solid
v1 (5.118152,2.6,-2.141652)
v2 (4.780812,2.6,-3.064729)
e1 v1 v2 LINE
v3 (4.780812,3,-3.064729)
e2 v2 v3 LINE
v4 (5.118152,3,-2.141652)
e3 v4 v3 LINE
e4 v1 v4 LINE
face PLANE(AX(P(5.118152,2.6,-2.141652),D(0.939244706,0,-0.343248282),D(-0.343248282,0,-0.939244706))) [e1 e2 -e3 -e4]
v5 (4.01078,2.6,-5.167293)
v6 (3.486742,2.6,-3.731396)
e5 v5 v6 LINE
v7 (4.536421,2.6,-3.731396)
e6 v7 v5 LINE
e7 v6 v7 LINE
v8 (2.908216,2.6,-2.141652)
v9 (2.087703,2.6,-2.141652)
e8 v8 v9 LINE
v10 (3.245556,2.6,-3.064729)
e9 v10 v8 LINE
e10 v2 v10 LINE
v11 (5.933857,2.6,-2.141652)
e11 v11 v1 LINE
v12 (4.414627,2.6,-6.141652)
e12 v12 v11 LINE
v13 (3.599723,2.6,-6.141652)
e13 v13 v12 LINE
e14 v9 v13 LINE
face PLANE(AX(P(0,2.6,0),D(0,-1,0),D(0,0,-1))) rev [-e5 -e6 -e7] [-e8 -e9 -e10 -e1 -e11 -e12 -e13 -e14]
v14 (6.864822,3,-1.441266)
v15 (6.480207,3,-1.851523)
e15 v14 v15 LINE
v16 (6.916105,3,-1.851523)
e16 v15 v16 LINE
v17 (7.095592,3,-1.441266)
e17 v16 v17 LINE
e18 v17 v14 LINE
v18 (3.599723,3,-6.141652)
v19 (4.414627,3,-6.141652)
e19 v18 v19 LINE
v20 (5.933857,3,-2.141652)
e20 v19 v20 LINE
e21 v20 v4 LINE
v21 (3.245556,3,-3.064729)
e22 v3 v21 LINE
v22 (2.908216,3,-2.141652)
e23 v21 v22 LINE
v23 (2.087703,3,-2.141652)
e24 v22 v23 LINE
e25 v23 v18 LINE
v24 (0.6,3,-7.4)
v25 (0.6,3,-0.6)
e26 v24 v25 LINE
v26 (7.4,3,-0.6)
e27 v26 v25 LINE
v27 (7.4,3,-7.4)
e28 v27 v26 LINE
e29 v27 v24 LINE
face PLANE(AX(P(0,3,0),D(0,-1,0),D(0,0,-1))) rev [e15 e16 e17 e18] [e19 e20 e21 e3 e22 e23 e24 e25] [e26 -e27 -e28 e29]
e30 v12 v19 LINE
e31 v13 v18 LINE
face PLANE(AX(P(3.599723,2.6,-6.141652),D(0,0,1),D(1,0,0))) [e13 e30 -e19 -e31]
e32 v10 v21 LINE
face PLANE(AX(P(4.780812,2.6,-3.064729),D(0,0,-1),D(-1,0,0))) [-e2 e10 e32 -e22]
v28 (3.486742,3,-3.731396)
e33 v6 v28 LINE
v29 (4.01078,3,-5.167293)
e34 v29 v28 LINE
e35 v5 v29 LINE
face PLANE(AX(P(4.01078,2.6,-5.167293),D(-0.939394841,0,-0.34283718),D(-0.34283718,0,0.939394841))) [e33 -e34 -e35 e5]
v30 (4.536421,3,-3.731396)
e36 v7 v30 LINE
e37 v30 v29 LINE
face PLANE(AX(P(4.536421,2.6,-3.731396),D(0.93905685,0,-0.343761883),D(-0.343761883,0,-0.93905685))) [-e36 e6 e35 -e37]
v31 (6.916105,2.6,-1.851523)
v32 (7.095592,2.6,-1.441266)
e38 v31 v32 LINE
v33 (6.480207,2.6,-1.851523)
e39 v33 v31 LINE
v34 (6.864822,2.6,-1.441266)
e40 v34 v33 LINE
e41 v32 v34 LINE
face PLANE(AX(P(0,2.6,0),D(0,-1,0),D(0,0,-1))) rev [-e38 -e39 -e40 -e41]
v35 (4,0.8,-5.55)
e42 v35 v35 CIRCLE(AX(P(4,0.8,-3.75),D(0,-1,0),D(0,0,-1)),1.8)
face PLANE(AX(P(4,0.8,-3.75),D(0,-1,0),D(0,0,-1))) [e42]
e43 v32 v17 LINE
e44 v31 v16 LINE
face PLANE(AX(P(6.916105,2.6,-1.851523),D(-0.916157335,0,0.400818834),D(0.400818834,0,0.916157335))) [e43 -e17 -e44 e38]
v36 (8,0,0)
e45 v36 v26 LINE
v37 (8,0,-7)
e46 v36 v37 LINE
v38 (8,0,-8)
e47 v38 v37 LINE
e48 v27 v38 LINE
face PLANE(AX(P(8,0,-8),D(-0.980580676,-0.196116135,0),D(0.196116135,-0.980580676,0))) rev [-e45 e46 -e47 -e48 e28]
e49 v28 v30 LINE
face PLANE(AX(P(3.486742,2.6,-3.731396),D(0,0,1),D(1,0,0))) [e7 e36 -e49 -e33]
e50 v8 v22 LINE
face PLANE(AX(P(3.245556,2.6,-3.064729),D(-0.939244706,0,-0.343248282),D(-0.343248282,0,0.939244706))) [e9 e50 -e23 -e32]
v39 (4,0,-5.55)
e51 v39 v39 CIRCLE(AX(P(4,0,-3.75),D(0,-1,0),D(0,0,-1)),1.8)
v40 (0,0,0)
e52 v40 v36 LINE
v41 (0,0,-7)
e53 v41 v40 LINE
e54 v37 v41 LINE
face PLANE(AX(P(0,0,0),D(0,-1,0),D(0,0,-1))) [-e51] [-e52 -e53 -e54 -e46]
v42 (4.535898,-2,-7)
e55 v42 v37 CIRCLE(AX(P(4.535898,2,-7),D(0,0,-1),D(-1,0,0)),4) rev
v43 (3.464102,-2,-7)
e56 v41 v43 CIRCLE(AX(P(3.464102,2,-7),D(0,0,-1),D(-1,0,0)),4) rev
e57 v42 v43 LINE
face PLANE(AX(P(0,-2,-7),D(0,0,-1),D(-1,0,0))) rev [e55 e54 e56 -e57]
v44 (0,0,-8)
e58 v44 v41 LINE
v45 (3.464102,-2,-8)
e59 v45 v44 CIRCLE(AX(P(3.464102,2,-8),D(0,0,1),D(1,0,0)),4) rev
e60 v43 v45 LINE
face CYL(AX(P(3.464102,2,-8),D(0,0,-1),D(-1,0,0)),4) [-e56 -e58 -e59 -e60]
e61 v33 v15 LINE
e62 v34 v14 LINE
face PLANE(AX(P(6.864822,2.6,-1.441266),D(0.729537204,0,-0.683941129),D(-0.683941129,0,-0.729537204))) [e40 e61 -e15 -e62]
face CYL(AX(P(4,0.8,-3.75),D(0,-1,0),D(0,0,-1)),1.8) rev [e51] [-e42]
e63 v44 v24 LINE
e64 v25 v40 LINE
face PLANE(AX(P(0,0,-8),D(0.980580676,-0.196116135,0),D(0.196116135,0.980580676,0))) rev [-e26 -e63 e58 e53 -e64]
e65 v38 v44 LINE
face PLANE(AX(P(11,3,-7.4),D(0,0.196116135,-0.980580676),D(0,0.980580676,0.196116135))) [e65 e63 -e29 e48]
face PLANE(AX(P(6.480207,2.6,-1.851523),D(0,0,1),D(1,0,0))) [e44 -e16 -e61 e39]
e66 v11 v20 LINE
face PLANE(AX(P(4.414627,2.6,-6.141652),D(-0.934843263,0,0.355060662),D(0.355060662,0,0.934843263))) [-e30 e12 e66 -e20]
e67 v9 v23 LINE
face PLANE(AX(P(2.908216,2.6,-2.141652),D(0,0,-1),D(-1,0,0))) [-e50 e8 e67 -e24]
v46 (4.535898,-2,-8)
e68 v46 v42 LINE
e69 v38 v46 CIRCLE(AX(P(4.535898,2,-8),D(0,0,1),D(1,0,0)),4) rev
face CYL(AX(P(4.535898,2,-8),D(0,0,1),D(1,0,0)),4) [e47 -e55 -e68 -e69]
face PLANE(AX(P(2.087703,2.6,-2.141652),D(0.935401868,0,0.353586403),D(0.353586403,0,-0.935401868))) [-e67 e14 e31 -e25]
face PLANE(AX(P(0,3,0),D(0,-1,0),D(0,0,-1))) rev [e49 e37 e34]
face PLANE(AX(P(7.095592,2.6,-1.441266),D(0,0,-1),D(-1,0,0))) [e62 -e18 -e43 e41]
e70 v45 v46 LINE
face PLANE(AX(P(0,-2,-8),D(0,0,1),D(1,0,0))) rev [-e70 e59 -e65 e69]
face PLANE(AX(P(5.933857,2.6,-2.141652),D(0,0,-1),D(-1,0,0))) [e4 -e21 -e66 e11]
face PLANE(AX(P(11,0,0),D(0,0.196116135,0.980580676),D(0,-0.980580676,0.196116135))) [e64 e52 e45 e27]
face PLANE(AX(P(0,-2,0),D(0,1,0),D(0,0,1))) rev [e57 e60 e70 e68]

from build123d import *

# Parameters (mm, degrees)
SKETCH1_W               = 8
SKETCH1_H               = 8
BOSS_EXTRUDE1_DEPTH     = 3
CUT_EXTRUDE1_DEPTH      = 12.704699911
CUT_EXTRUDE1_DEPTH_BACK = 12.704699911
CUT_EXTRUDE2_DEPTH      = 11
SKETCH4_R               = 1.8
CUT_EXTRUDE3_DEPTH      = 0.8
SKETCH5_W               = 8
SKETCH5_H               = 1
BOSS_EXTRUDE2_DEPTH     = 2
FILLET1_R               = 4
CUT_EXTRUDE4_DEPTH      = 0.4
CUT_EXTRUDE5_DEPTH      = 0.4


with BuildPart() as part:
    # Sketch1 → Boss-Extrude1 (new body)
    with BuildSketch(Plane(origin=(0, 0, 0), x_dir=(1, 0, 0), z_dir=(0, 1, 0))):
        with Locations((4, 4)):
            Rectangle(SKETCH1_W, SKETCH1_H)
    extrude(amount=BOSS_EXTRUDE1_DEPTH)

    # Sketch2 → Cut-Extrude1 (cut, two sides: drawn at the far end of the back side and taken through both)
    with BuildSketch(Plane.XY.offset(-CUT_EXTRUDE1_DEPTH_BACK)):
        Polygon((0, 0), (0.6, 3), (0, 3), align=None)
        Polygon((8, 0), (7.4, 3), (8, 3), align=None)
    extrude(amount=CUT_EXTRUDE1_DEPTH + CUT_EXTRUDE1_DEPTH_BACK, mode=Mode.SUBTRACT)

    # Sketch3 → Cut-Extrude2 (cut)
    with BuildSketch(Plane(origin=(0, 0, 0), x_dir=(0, 0, -1), z_dir=(1, 0, 0))):
        Polygon((0, 0), (0.6, 3), (0, 3), align=None)
        Polygon((8, 3), (7.4, 3), (8, 0), align=None)
    extrude(amount=CUT_EXTRUDE2_DEPTH, mode=Mode.SUBTRACT)

    # Sketch4 → Cut-Extrude3 (cut)
    with BuildSketch(Plane.XZ):
        with Locations(Location((4, -3.75, 0), (0, 0, 270))):
            Circle(SKETCH4_R)
    extrude(amount=-CUT_EXTRUDE3_DEPTH, mode=Mode.SUBTRACT)

    # Sketch5 → Boss-Extrude2 (add)
    with BuildSketch(Plane.XZ):
        with Locations((4, -7.5)):
            Rectangle(SKETCH5_W, SKETCH5_H)
    extrude(amount=BOSS_EXTRUDE2_DEPTH)

    # Fillet1
    # the kernel refuses this fillet: 4 mm, written as the material it takes off along each edge
    with BuildSketch(Plane(origin=(8, -2, -16.660254038), x_dir=(0, 1, 0), z_dir=(0, 0, 1)), Plane(origin=(0, -2, 1.660254038), x_dir=(0, 1, 0), z_dir=(0, 0, -1))) as fillet1_piece_1:
        with BuildLine():
            CenterArc((4, 3.464101615), FILLET1_R, 180, 60)
            Line((0, 3.464101615), (-0.08, 3.464101615))
            Line((-0.08, 3.464101615), (-0.08, 0))
            Line((-0.08, 0), (0, -0.08))
            ThreePointArc((0, -0.08), (1, -0.08), (1.96, -0.069282032))
            Line((1.96, -0.069282032), (2, 0))
        make_face()
    extrude(amount=18.320508076, mode=Mode.SUBTRACT)

    # Sketch6 → Cut-Extrude4 (cut)
    with BuildSketch(Plane(origin=(0, 3, 0), x_dir=(1, 0, 0), z_dir=(0, 1, 0))):
        Polygon((5.933857302, 2.141652068), (5.118152174, 2.141652068), (4.780812431, 3.064728992), (3.24555602, 3.064728992), (2.908216277, 2.141652068), (2.087703456, 2.141652068), (3.599722687, 6.141652068), (4.414626533, 6.141652068), align=None)
        Polygon((4.536421405, 3.731395658), (4.010780379, 5.167293094), (3.486741918, 3.731395658), align=None, mode=Mode.SUBTRACT)
    extrude(amount=-CUT_EXTRUDE4_DEPTH, mode=Mode.SUBTRACT)

    # Sketch7 → Cut-Extrude5 (cut)
    with BuildSketch(Plane(origin=(0, 3, 0), x_dir=(1, 0, 0), z_dir=(0, 1, 0))):
        Polygon((7.095591712, 1.44126633), (6.864822481, 1.44126633), (6.480207097, 1.85152274), (6.916104533, 1.85152274), align=None)
    extrude(amount=-CUT_EXTRUDE5_DEPTH, mode=Mode.SUBTRACT)


solid = part.part
